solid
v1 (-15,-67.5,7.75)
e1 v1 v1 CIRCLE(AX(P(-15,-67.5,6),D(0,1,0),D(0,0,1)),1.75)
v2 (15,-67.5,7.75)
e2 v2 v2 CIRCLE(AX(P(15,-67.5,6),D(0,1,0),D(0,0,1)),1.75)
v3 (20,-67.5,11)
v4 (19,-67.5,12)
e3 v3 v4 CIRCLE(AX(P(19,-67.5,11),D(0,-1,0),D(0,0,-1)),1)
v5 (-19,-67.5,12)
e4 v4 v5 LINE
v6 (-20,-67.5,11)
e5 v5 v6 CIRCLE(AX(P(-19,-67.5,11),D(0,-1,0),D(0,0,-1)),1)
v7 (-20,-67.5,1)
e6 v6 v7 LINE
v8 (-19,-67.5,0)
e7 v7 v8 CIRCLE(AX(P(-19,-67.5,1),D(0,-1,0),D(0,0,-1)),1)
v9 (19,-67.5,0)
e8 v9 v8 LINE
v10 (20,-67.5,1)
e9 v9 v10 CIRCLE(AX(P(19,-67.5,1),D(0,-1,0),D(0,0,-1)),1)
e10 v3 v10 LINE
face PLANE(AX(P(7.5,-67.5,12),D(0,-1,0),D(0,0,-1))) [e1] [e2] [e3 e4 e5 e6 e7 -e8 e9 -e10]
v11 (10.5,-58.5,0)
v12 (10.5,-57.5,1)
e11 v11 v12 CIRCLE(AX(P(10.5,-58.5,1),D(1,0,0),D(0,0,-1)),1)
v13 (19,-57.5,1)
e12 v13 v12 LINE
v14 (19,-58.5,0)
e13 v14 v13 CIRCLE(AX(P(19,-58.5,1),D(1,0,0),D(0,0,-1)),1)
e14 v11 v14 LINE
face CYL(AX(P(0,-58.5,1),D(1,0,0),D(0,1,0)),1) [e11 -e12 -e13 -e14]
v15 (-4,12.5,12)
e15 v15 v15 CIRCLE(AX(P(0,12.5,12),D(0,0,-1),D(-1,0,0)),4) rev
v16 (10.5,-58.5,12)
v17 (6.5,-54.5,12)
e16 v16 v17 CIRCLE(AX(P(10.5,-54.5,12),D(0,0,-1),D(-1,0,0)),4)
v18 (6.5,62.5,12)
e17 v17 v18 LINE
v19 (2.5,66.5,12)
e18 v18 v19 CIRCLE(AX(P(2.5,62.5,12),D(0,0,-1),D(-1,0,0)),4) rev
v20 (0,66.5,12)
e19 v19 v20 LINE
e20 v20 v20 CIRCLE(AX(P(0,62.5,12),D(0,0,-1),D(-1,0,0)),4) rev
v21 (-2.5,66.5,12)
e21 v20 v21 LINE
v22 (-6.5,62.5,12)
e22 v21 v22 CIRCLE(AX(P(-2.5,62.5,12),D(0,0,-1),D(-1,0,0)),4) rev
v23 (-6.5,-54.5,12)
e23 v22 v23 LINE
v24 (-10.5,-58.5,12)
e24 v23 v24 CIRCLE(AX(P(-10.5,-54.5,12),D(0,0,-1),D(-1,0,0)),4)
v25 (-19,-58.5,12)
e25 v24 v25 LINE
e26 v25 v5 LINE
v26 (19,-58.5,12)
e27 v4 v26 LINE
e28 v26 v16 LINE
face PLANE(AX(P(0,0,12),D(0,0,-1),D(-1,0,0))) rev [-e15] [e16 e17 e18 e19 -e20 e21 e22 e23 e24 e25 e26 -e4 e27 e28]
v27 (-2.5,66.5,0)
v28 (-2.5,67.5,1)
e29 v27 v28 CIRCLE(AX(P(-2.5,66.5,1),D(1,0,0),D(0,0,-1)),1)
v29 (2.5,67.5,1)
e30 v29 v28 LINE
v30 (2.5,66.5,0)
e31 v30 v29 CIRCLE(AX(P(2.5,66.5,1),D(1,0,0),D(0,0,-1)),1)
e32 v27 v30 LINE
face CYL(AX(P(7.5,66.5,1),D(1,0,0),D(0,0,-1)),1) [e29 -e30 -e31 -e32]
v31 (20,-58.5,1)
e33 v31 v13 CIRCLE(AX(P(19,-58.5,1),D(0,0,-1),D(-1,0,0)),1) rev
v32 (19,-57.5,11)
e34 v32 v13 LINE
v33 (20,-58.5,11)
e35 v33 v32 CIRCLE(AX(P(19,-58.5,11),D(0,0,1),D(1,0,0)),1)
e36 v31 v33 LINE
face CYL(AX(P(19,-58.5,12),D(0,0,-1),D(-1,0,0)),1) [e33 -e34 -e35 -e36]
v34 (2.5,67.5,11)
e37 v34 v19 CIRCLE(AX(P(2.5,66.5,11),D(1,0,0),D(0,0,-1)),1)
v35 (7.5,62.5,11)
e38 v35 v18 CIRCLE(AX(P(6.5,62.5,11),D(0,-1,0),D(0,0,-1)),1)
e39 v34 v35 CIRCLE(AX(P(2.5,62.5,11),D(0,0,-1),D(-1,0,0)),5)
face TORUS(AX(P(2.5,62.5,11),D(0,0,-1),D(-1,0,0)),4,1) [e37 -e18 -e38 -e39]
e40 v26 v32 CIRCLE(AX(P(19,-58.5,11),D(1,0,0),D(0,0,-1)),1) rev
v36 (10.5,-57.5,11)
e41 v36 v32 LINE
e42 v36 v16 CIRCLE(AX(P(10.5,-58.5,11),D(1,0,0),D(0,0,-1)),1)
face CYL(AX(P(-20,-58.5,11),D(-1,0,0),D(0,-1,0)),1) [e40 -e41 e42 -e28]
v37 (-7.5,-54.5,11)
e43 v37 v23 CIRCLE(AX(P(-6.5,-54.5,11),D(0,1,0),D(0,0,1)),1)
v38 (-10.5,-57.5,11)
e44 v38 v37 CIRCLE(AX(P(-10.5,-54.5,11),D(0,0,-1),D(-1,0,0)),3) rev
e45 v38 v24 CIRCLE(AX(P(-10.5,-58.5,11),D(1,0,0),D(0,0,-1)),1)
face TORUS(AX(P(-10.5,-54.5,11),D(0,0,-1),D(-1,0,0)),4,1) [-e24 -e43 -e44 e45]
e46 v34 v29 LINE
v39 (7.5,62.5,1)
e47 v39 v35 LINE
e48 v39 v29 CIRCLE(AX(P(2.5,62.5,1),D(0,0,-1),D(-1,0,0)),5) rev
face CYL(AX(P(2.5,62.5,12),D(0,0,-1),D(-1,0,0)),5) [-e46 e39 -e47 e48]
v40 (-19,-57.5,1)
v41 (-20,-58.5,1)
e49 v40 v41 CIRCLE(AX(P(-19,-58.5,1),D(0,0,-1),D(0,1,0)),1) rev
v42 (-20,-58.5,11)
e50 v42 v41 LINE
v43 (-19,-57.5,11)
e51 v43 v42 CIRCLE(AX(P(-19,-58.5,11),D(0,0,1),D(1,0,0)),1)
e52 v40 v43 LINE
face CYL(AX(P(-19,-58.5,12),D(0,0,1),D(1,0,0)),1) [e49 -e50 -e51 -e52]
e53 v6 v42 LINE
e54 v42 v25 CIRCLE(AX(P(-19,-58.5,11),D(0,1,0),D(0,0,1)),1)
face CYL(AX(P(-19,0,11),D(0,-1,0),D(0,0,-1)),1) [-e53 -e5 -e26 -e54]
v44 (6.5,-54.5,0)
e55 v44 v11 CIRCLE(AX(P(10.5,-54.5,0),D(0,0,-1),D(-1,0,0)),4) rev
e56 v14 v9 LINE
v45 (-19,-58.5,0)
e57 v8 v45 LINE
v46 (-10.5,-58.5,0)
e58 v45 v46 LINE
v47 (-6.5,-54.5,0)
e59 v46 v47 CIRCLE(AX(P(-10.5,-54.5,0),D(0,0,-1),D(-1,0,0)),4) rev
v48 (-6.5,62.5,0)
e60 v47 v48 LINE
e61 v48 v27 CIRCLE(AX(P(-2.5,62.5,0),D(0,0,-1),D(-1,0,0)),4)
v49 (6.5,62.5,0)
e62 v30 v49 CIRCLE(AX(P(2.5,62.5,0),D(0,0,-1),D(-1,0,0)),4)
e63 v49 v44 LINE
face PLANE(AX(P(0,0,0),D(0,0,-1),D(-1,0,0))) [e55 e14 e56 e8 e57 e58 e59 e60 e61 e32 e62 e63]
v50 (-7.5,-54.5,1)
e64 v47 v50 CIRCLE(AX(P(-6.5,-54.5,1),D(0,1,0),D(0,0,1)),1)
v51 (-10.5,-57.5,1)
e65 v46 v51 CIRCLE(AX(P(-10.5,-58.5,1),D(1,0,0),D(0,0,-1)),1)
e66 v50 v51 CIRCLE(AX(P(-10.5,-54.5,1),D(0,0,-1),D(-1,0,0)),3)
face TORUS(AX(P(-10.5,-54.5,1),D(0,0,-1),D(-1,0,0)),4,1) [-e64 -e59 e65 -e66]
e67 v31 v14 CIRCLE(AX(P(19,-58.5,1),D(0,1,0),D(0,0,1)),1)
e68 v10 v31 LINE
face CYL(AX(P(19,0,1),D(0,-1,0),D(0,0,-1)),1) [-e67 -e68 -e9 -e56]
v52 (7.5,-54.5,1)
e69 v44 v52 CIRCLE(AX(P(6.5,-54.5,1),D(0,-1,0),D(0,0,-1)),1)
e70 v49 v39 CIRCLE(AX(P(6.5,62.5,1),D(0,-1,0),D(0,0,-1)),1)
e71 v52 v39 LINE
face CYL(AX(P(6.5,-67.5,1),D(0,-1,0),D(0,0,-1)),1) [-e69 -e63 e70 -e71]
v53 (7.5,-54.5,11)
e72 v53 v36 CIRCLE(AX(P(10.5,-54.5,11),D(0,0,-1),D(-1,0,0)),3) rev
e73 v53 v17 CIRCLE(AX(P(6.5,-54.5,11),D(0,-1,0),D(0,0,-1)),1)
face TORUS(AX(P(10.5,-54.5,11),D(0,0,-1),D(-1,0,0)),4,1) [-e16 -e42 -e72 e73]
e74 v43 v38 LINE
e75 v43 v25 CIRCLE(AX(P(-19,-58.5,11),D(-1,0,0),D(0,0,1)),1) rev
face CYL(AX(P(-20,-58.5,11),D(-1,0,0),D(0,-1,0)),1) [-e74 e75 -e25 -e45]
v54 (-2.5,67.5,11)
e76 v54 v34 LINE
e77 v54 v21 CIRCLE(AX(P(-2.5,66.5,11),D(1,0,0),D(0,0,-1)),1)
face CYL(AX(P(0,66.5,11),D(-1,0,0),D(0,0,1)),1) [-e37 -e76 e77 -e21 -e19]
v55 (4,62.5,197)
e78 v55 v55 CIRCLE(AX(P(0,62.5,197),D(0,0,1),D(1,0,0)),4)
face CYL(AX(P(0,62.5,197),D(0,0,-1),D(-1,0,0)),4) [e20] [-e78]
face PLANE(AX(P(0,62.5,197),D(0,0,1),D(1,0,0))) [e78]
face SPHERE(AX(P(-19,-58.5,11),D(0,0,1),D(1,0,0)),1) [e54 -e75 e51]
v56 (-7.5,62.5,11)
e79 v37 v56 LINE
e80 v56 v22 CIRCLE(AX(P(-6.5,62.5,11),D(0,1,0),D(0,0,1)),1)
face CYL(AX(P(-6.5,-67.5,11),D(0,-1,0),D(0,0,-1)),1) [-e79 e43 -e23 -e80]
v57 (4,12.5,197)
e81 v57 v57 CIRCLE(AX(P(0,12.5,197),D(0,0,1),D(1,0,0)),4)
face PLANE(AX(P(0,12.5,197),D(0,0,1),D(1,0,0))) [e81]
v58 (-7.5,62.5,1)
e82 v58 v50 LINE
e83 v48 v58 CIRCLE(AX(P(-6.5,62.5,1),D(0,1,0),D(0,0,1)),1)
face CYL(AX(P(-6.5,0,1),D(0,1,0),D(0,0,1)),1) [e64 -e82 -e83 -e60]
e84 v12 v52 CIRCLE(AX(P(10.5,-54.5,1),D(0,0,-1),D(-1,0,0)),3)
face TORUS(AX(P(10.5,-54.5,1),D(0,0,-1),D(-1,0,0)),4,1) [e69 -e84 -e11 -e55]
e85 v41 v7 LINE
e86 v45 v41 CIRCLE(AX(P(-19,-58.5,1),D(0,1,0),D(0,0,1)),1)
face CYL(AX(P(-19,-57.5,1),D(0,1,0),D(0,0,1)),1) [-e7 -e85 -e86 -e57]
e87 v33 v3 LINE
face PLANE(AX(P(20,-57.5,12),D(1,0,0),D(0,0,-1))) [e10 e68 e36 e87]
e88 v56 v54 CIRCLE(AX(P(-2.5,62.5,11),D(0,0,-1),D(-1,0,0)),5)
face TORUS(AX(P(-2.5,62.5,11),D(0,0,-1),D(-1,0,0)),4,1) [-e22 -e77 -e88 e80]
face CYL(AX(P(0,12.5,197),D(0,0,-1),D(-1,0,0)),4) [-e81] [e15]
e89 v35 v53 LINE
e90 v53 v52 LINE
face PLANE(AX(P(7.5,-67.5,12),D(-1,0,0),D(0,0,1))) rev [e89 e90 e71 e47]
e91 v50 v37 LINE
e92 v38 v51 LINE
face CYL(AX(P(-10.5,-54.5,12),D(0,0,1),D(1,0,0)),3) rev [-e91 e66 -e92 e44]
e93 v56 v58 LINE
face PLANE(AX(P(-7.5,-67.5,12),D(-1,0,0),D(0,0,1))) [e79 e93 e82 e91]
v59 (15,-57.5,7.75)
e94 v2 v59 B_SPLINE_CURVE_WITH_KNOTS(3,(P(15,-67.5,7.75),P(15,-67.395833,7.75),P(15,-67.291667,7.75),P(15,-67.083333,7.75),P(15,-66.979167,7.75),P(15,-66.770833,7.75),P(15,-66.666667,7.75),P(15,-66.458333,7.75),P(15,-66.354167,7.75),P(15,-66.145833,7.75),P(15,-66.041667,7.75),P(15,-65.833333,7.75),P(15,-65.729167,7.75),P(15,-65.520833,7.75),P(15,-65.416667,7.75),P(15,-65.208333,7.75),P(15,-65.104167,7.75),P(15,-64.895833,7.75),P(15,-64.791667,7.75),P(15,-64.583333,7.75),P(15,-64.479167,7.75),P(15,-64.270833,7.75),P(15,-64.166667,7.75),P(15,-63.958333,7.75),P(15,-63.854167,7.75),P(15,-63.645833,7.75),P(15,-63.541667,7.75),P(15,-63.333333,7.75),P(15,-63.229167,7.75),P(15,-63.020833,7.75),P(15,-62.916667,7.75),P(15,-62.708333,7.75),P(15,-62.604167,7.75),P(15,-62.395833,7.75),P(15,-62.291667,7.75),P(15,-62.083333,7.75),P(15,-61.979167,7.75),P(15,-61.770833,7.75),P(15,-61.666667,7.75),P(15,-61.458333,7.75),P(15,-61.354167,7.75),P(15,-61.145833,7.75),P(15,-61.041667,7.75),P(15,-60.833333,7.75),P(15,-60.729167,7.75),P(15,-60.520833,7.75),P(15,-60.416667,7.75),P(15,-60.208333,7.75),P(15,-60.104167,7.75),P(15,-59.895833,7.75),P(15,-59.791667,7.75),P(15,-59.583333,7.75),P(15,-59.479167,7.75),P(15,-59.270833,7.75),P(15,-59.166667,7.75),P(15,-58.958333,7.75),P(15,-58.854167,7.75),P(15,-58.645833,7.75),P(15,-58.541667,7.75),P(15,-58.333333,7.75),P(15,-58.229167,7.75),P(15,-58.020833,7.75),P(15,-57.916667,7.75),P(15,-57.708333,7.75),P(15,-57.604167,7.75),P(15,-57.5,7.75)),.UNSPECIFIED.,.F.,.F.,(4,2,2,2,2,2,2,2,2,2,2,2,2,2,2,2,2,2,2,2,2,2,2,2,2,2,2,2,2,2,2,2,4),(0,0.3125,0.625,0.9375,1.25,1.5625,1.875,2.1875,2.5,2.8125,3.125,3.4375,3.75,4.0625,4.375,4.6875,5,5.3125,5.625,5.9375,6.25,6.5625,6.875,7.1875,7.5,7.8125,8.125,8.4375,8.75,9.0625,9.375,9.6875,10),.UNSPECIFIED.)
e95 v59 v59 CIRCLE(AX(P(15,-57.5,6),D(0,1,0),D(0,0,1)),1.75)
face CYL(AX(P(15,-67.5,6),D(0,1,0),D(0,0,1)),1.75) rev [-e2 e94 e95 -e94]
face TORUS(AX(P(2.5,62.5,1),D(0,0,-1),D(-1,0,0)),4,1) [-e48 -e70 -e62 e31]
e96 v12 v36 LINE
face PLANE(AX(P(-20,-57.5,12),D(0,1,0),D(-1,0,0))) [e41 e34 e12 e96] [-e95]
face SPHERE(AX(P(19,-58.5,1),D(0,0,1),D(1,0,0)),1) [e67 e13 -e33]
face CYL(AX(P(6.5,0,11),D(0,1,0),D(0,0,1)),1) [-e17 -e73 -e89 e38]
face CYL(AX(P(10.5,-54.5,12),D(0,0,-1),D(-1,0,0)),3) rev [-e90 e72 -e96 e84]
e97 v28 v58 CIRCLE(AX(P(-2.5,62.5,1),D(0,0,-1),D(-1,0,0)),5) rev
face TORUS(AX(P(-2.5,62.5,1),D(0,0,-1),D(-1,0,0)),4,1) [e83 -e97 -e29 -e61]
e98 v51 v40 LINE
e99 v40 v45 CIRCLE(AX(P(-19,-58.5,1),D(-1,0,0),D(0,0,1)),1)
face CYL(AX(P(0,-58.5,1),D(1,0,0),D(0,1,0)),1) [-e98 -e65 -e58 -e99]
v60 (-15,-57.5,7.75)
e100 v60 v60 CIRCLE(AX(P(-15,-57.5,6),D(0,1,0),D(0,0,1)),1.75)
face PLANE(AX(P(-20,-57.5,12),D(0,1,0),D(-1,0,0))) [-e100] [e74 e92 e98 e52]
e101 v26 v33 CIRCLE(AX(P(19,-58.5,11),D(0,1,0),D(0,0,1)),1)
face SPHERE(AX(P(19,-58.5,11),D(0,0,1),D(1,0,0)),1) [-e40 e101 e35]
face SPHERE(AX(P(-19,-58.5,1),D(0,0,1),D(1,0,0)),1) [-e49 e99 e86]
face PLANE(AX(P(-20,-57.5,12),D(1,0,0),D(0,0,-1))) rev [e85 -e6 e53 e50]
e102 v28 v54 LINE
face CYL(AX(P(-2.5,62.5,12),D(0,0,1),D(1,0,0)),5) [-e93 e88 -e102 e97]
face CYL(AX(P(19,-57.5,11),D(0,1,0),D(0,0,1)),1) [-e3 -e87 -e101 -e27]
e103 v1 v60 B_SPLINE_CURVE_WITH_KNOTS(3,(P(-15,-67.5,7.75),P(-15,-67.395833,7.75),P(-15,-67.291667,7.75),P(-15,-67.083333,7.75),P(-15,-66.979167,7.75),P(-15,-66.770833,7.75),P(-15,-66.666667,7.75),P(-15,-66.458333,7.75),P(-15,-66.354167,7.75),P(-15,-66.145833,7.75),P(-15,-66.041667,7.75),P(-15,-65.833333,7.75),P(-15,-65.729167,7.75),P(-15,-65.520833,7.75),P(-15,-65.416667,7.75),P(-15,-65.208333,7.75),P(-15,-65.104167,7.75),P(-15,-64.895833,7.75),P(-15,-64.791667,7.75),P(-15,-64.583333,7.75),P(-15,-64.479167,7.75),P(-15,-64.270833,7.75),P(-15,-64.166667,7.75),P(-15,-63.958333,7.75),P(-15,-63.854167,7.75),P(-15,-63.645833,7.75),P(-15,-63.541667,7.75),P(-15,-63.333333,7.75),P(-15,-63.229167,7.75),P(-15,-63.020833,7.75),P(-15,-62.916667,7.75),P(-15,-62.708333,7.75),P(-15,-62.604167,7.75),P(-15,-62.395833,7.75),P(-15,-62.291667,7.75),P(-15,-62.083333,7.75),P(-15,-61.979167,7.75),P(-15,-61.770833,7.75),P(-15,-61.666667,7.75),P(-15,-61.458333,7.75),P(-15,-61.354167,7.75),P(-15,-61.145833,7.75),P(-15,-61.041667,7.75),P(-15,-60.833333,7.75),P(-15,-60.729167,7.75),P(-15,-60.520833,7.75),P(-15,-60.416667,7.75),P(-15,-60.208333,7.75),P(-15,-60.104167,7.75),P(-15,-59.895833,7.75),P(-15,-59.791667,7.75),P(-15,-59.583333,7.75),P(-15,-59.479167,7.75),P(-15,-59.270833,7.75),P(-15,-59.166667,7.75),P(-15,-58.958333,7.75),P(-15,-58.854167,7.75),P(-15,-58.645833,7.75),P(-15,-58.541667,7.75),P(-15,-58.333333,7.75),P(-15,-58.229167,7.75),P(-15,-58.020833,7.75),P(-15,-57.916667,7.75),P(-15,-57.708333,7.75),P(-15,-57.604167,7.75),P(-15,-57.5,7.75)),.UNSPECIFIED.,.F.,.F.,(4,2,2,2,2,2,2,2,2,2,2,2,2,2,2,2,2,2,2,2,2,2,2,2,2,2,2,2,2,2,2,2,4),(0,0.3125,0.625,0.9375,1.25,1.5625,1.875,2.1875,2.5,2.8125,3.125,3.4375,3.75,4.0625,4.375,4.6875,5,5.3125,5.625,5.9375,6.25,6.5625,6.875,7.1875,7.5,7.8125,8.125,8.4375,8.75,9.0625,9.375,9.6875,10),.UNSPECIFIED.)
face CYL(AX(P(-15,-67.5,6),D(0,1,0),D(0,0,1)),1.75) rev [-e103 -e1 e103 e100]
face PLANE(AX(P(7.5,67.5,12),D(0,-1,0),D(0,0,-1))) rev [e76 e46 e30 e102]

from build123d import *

# Parameters (mm, degrees)
SKETCH_1_W          = 15
SKETCH_1_H          = 135
SKETCH_1_W_2        = 40
SKETCH_1_H_2        = 10
EXTRUDE_1_DEPTH     = 12
SKETCH_2_R          = 4
EXTRUDE_2_DEPTH     = 185
SKETCH_3_R          = 1.75
CUT_EXTRUDE_1_DEPTH = 235.166607355
FILLET_1_R          = 3
FILLET_2_R          = 5
FILLET_3_R          = 1


with BuildPart() as part:
    # ｽｹｯﾁ1 → ﾎﾞｽ - 押し出し1 (new body)
    with BuildSketch(Plane.XY):
        Rectangle(SKETCH_1_W, SKETCH_1_H)
        with Locations((0, -62.5)):
            Rectangle(SKETCH_1_W_2, SKETCH_1_H_2)
    extrude(amount=EXTRUDE_1_DEPTH)

    # ｽｹｯﾁ2 → ﾎﾞｽ - 押し出し2 (add)
    with BuildSketch(Plane.XY.offset(12)):
        with Locations(Location((0, 12.5, 0), (0, 0, 180))):
            Circle(SKETCH_2_R)
        with Locations(Location((0, 62.5, 0), (0, 0, 180))):
            Circle(SKETCH_2_R)
    extrude(amount=EXTRUDE_2_DEPTH)

    # ｽｹｯﾁ3 → ｶｯﾄ - 押し出し1 (cut, through all)
    with BuildSketch(Plane(origin=(0, -57.5, 0), x_dir=(1, 0, 0), z_dir=(0, 1, 0))):
        with Locations(Location((-15, -6, 0), (0, 0, 270))):
            Circle(SKETCH_3_R)
        with Locations(Location((15, -6, 0), (0, 0, 270))):
            Circle(SKETCH_3_R)
    extrude(amount=-CUT_EXTRUDE_1_DEPTH, mode=Mode.SUBTRACT)

    # ﾌｨﾚｯﾄ1
    fillet_1_edges = [part.edges().sort_by_distance(p)[0] for p in [
        (-7.5, -57.5, 6),
        (7.5, -57.5, 6),
    ]]
    fillet(fillet_1_edges, radius=FILLET_1_R)

    # ﾌｨﾚｯﾄ2
    fillet_2_edges = [part.edges().sort_by_distance(p)[0] for p in [
        (7.5, 67.5, 6),
        (-7.5, 67.5, 6),
    ]]
    fillet(fillet_2_edges, radius=FILLET_2_R)

    # ﾌｨﾚｯﾄ3
    fillet_3_edges = [part.edges().sort_by_distance(p)[0] for p in [
        (20, -57.5, 6),
        (-20, -57.5, 6),
        (-15.25, -57.5, 12),
        (20, -62.5, 12),
        (-20, -62.5, 12),
        (-15.25, -57.5, 0),
        (20, -62.5, 0),
        (-20, -62.5, 0),
        (7.5, 4, 12),
        (7.5, 4, 0),
        (15.25, -57.5, 12),
        (15.25, -57.5, 0),
        (-7.5, 4, 12),
        (-7.5, 4, 0),
        (8.378679656, -56.621320344, 0),
        (8.378679656, -56.621320344, 12),
        (-8.378679656, -56.621320344, 0),
        (-8.378679656, -56.621320344, 12),
        (0, 67.5, 0),
        (0, 67.5, 12),
        (-6.035533906, 66.035533906, 0),
        (6.035533906, 66.035533906, 0),
        (-6.035533906, 66.035533906, 12),
        (6.035533906, 66.035533906, 12),
    ]]
    fillet(fillet_3_edges, radius=FILLET_3_R - 0.0001)  # a hair under: the kernel refuses the full size


solid = part.part
